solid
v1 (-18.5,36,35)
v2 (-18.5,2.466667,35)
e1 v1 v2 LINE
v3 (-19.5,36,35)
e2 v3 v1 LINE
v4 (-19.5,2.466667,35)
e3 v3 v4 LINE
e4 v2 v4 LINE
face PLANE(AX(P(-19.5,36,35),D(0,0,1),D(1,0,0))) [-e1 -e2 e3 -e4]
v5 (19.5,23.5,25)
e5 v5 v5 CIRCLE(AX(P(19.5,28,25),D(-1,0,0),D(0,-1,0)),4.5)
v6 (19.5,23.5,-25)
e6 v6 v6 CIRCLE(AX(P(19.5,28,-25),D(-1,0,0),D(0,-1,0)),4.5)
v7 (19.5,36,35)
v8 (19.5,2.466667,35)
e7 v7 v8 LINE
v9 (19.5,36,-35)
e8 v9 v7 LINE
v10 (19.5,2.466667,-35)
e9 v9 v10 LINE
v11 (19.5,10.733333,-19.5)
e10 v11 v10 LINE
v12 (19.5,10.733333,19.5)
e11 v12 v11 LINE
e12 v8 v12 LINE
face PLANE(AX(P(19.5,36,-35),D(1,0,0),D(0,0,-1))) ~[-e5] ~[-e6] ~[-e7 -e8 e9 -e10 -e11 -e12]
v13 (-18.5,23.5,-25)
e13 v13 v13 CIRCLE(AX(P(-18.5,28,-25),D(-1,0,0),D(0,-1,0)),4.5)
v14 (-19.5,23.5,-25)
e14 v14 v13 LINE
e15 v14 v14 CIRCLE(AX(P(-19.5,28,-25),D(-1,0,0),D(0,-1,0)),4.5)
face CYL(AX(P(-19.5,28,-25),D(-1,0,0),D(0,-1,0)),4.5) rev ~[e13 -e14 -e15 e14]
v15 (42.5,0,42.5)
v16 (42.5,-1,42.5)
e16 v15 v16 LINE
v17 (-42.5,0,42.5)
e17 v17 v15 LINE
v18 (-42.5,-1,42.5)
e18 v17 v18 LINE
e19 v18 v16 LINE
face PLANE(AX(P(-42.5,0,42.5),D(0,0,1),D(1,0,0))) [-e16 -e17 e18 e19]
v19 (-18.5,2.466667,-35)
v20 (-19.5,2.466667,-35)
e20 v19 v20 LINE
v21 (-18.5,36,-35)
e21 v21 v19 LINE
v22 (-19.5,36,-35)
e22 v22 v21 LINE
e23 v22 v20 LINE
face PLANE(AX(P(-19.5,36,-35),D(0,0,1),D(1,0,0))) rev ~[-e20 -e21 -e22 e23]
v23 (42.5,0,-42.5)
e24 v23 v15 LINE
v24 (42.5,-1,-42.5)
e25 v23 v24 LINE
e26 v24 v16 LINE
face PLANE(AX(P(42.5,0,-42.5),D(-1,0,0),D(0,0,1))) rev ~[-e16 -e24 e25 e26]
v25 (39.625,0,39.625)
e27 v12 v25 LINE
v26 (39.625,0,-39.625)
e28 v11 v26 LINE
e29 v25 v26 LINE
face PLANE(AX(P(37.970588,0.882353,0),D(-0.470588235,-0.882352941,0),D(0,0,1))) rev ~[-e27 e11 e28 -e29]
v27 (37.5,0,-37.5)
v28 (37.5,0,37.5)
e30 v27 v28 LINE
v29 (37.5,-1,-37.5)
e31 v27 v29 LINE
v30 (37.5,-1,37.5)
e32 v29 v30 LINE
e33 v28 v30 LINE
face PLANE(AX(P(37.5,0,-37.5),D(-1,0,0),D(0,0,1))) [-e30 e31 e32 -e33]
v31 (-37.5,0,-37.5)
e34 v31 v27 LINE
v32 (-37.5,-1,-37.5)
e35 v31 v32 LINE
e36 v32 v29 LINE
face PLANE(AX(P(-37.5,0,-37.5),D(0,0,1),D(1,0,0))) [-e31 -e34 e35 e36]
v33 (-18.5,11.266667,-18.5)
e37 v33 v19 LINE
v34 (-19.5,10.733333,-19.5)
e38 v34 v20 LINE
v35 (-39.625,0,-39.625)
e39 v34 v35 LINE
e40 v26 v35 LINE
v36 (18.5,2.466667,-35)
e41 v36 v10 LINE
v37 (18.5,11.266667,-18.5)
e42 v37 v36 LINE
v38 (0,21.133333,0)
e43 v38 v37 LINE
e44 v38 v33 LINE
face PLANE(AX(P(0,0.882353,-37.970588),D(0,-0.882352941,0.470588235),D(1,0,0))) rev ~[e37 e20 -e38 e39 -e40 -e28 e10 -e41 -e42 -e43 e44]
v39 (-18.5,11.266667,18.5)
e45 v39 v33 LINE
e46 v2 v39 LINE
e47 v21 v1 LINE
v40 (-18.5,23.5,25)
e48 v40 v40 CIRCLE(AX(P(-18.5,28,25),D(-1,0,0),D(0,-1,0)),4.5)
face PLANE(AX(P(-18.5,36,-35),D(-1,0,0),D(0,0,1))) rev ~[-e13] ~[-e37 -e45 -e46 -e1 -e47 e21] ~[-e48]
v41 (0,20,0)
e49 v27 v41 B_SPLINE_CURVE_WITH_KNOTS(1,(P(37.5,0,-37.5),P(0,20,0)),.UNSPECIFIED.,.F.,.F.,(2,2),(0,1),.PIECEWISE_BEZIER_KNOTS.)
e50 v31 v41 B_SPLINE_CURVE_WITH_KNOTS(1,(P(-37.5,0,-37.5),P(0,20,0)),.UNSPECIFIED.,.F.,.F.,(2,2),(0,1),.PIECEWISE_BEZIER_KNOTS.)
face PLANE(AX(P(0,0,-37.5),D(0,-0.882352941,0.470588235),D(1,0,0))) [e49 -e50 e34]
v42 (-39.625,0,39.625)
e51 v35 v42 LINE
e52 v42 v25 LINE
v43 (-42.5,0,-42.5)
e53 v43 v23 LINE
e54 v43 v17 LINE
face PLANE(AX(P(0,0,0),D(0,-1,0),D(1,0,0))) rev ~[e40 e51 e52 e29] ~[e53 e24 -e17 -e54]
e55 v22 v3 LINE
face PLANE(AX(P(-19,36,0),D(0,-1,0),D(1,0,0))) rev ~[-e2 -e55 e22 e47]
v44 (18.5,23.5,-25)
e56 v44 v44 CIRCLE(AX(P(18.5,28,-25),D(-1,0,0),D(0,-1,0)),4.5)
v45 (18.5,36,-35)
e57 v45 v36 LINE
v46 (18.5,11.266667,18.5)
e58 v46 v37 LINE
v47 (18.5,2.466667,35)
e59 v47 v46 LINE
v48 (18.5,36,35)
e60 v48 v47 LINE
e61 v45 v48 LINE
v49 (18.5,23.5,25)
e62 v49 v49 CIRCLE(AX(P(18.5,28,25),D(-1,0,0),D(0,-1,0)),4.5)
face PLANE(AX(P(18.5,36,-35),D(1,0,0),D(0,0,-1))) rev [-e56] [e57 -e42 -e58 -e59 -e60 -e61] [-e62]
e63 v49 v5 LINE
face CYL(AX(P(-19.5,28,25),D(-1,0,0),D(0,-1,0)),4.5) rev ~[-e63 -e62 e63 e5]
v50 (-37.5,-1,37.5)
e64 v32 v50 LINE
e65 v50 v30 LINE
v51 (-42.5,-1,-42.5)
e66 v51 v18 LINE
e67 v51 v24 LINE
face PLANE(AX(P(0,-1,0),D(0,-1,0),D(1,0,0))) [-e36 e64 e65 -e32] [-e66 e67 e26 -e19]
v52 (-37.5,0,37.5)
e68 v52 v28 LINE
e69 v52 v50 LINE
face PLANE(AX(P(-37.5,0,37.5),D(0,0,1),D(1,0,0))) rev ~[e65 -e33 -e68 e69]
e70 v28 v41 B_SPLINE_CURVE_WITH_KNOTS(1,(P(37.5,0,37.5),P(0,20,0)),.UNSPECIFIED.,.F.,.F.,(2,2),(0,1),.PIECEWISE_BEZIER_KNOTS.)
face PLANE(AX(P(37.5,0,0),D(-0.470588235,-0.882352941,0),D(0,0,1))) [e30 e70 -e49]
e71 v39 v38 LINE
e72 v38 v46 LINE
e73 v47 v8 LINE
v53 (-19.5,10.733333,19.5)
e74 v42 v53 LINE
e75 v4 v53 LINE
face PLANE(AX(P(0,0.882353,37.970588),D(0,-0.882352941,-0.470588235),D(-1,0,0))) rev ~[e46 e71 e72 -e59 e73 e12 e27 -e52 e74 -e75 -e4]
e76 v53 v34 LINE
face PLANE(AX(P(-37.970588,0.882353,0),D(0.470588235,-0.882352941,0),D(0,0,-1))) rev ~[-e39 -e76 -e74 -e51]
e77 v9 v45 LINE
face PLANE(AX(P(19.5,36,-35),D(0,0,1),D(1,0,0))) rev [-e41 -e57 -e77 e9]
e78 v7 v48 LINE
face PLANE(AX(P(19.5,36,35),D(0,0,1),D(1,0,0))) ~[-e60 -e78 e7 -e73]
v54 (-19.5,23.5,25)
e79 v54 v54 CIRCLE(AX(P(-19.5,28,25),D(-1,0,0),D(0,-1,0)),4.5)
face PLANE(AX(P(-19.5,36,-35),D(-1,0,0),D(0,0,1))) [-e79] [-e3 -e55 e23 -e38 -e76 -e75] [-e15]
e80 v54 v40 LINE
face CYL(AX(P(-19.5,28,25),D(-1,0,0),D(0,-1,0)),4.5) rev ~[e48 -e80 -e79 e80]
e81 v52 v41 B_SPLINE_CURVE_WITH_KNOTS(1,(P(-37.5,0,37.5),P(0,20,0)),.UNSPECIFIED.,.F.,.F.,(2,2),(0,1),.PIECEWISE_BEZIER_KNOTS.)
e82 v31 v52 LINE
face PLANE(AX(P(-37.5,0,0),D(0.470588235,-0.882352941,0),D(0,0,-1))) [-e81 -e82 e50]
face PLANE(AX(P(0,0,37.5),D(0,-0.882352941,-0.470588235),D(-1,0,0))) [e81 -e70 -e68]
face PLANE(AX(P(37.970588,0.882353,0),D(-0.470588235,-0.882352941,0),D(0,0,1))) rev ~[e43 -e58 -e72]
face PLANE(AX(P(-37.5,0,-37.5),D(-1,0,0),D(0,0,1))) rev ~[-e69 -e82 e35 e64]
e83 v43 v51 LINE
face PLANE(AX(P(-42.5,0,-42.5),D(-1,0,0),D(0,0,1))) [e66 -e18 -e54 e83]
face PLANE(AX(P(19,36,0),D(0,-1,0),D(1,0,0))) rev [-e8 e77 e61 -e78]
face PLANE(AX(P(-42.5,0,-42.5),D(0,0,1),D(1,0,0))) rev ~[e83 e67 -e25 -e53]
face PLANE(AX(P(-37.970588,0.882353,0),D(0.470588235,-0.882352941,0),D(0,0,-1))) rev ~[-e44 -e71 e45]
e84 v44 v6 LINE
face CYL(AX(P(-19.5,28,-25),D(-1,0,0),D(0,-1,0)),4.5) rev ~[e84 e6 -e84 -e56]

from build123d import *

# Parameters (mm, degrees)
F0_W      = 75
F0_H      = 75
F4_T      = 1
F0_W_2    = 85
F0_H_2    = 85
F5_DEPTH  = 1
F7_W      = 1
F7_H      = 70
F9_R      = 4.5
F10_DEPTH = 62.001


# Not quite as in the source:
# - a pattern or mirror of a feature is missing from the dataset's text; its kind, count and spacing are read off the source's solid


with BuildPart() as f3:
    # F0 (on Front) → F3 section 0
    with BuildSketch(Plane.XZ, mode=Mode.PRIVATE) as f3_s0:
        Rectangle(F0_W, F0_H)
    loft([f3_s0.sketch, Vertex(0, 20, 0)])

    # F4
    f4_openings = [f3.faces().sort_by_distance(p)[0] for p in [
        (0, 0, 0),
    ]]
    offset(amount=F4_T, openings=f4_openings, kind=Kind.INTERSECTION)

    # F0 (on Front) → F5 (join)
    with BuildSketch(Plane.XZ):
        Rectangle(F0_W_2, F0_H_2)
        Rectangle(F0_W, F0_H, mode=Mode.SUBTRACT)
    extrude(amount=F5_DEPTH)

    # F7 (on offset) → F8 (join, up to the next surface of F3)
    with BuildSketch(Plane.XZ.offset(-36)):
        with Locations((-19, 0)):
            Rectangle(F7_W, F7_H)
    f8 = extrude(until=Until.NEXT)

    # F8_copies: F8 across plane
    add(f8.mirror(Plane(origin=(0, 0, 0), x_dir=(0, 0, 1), z_dir=(1, 0, 0))))

    # F9 (on face) → F10 (cut, through all)
    with BuildSketch(Plane(origin=(-19.5, 0, 0), x_dir=(0, -1, 0), z_dir=(-1, 0, 0))):
        with Locations((-28, -25)):
            Circle(F9_R)
        with Locations((-28, 25)):
            Circle(F9_R)
    extrude(amount=-F10_DEPTH, mode=Mode.SUBTRACT)


solid = f3.part
